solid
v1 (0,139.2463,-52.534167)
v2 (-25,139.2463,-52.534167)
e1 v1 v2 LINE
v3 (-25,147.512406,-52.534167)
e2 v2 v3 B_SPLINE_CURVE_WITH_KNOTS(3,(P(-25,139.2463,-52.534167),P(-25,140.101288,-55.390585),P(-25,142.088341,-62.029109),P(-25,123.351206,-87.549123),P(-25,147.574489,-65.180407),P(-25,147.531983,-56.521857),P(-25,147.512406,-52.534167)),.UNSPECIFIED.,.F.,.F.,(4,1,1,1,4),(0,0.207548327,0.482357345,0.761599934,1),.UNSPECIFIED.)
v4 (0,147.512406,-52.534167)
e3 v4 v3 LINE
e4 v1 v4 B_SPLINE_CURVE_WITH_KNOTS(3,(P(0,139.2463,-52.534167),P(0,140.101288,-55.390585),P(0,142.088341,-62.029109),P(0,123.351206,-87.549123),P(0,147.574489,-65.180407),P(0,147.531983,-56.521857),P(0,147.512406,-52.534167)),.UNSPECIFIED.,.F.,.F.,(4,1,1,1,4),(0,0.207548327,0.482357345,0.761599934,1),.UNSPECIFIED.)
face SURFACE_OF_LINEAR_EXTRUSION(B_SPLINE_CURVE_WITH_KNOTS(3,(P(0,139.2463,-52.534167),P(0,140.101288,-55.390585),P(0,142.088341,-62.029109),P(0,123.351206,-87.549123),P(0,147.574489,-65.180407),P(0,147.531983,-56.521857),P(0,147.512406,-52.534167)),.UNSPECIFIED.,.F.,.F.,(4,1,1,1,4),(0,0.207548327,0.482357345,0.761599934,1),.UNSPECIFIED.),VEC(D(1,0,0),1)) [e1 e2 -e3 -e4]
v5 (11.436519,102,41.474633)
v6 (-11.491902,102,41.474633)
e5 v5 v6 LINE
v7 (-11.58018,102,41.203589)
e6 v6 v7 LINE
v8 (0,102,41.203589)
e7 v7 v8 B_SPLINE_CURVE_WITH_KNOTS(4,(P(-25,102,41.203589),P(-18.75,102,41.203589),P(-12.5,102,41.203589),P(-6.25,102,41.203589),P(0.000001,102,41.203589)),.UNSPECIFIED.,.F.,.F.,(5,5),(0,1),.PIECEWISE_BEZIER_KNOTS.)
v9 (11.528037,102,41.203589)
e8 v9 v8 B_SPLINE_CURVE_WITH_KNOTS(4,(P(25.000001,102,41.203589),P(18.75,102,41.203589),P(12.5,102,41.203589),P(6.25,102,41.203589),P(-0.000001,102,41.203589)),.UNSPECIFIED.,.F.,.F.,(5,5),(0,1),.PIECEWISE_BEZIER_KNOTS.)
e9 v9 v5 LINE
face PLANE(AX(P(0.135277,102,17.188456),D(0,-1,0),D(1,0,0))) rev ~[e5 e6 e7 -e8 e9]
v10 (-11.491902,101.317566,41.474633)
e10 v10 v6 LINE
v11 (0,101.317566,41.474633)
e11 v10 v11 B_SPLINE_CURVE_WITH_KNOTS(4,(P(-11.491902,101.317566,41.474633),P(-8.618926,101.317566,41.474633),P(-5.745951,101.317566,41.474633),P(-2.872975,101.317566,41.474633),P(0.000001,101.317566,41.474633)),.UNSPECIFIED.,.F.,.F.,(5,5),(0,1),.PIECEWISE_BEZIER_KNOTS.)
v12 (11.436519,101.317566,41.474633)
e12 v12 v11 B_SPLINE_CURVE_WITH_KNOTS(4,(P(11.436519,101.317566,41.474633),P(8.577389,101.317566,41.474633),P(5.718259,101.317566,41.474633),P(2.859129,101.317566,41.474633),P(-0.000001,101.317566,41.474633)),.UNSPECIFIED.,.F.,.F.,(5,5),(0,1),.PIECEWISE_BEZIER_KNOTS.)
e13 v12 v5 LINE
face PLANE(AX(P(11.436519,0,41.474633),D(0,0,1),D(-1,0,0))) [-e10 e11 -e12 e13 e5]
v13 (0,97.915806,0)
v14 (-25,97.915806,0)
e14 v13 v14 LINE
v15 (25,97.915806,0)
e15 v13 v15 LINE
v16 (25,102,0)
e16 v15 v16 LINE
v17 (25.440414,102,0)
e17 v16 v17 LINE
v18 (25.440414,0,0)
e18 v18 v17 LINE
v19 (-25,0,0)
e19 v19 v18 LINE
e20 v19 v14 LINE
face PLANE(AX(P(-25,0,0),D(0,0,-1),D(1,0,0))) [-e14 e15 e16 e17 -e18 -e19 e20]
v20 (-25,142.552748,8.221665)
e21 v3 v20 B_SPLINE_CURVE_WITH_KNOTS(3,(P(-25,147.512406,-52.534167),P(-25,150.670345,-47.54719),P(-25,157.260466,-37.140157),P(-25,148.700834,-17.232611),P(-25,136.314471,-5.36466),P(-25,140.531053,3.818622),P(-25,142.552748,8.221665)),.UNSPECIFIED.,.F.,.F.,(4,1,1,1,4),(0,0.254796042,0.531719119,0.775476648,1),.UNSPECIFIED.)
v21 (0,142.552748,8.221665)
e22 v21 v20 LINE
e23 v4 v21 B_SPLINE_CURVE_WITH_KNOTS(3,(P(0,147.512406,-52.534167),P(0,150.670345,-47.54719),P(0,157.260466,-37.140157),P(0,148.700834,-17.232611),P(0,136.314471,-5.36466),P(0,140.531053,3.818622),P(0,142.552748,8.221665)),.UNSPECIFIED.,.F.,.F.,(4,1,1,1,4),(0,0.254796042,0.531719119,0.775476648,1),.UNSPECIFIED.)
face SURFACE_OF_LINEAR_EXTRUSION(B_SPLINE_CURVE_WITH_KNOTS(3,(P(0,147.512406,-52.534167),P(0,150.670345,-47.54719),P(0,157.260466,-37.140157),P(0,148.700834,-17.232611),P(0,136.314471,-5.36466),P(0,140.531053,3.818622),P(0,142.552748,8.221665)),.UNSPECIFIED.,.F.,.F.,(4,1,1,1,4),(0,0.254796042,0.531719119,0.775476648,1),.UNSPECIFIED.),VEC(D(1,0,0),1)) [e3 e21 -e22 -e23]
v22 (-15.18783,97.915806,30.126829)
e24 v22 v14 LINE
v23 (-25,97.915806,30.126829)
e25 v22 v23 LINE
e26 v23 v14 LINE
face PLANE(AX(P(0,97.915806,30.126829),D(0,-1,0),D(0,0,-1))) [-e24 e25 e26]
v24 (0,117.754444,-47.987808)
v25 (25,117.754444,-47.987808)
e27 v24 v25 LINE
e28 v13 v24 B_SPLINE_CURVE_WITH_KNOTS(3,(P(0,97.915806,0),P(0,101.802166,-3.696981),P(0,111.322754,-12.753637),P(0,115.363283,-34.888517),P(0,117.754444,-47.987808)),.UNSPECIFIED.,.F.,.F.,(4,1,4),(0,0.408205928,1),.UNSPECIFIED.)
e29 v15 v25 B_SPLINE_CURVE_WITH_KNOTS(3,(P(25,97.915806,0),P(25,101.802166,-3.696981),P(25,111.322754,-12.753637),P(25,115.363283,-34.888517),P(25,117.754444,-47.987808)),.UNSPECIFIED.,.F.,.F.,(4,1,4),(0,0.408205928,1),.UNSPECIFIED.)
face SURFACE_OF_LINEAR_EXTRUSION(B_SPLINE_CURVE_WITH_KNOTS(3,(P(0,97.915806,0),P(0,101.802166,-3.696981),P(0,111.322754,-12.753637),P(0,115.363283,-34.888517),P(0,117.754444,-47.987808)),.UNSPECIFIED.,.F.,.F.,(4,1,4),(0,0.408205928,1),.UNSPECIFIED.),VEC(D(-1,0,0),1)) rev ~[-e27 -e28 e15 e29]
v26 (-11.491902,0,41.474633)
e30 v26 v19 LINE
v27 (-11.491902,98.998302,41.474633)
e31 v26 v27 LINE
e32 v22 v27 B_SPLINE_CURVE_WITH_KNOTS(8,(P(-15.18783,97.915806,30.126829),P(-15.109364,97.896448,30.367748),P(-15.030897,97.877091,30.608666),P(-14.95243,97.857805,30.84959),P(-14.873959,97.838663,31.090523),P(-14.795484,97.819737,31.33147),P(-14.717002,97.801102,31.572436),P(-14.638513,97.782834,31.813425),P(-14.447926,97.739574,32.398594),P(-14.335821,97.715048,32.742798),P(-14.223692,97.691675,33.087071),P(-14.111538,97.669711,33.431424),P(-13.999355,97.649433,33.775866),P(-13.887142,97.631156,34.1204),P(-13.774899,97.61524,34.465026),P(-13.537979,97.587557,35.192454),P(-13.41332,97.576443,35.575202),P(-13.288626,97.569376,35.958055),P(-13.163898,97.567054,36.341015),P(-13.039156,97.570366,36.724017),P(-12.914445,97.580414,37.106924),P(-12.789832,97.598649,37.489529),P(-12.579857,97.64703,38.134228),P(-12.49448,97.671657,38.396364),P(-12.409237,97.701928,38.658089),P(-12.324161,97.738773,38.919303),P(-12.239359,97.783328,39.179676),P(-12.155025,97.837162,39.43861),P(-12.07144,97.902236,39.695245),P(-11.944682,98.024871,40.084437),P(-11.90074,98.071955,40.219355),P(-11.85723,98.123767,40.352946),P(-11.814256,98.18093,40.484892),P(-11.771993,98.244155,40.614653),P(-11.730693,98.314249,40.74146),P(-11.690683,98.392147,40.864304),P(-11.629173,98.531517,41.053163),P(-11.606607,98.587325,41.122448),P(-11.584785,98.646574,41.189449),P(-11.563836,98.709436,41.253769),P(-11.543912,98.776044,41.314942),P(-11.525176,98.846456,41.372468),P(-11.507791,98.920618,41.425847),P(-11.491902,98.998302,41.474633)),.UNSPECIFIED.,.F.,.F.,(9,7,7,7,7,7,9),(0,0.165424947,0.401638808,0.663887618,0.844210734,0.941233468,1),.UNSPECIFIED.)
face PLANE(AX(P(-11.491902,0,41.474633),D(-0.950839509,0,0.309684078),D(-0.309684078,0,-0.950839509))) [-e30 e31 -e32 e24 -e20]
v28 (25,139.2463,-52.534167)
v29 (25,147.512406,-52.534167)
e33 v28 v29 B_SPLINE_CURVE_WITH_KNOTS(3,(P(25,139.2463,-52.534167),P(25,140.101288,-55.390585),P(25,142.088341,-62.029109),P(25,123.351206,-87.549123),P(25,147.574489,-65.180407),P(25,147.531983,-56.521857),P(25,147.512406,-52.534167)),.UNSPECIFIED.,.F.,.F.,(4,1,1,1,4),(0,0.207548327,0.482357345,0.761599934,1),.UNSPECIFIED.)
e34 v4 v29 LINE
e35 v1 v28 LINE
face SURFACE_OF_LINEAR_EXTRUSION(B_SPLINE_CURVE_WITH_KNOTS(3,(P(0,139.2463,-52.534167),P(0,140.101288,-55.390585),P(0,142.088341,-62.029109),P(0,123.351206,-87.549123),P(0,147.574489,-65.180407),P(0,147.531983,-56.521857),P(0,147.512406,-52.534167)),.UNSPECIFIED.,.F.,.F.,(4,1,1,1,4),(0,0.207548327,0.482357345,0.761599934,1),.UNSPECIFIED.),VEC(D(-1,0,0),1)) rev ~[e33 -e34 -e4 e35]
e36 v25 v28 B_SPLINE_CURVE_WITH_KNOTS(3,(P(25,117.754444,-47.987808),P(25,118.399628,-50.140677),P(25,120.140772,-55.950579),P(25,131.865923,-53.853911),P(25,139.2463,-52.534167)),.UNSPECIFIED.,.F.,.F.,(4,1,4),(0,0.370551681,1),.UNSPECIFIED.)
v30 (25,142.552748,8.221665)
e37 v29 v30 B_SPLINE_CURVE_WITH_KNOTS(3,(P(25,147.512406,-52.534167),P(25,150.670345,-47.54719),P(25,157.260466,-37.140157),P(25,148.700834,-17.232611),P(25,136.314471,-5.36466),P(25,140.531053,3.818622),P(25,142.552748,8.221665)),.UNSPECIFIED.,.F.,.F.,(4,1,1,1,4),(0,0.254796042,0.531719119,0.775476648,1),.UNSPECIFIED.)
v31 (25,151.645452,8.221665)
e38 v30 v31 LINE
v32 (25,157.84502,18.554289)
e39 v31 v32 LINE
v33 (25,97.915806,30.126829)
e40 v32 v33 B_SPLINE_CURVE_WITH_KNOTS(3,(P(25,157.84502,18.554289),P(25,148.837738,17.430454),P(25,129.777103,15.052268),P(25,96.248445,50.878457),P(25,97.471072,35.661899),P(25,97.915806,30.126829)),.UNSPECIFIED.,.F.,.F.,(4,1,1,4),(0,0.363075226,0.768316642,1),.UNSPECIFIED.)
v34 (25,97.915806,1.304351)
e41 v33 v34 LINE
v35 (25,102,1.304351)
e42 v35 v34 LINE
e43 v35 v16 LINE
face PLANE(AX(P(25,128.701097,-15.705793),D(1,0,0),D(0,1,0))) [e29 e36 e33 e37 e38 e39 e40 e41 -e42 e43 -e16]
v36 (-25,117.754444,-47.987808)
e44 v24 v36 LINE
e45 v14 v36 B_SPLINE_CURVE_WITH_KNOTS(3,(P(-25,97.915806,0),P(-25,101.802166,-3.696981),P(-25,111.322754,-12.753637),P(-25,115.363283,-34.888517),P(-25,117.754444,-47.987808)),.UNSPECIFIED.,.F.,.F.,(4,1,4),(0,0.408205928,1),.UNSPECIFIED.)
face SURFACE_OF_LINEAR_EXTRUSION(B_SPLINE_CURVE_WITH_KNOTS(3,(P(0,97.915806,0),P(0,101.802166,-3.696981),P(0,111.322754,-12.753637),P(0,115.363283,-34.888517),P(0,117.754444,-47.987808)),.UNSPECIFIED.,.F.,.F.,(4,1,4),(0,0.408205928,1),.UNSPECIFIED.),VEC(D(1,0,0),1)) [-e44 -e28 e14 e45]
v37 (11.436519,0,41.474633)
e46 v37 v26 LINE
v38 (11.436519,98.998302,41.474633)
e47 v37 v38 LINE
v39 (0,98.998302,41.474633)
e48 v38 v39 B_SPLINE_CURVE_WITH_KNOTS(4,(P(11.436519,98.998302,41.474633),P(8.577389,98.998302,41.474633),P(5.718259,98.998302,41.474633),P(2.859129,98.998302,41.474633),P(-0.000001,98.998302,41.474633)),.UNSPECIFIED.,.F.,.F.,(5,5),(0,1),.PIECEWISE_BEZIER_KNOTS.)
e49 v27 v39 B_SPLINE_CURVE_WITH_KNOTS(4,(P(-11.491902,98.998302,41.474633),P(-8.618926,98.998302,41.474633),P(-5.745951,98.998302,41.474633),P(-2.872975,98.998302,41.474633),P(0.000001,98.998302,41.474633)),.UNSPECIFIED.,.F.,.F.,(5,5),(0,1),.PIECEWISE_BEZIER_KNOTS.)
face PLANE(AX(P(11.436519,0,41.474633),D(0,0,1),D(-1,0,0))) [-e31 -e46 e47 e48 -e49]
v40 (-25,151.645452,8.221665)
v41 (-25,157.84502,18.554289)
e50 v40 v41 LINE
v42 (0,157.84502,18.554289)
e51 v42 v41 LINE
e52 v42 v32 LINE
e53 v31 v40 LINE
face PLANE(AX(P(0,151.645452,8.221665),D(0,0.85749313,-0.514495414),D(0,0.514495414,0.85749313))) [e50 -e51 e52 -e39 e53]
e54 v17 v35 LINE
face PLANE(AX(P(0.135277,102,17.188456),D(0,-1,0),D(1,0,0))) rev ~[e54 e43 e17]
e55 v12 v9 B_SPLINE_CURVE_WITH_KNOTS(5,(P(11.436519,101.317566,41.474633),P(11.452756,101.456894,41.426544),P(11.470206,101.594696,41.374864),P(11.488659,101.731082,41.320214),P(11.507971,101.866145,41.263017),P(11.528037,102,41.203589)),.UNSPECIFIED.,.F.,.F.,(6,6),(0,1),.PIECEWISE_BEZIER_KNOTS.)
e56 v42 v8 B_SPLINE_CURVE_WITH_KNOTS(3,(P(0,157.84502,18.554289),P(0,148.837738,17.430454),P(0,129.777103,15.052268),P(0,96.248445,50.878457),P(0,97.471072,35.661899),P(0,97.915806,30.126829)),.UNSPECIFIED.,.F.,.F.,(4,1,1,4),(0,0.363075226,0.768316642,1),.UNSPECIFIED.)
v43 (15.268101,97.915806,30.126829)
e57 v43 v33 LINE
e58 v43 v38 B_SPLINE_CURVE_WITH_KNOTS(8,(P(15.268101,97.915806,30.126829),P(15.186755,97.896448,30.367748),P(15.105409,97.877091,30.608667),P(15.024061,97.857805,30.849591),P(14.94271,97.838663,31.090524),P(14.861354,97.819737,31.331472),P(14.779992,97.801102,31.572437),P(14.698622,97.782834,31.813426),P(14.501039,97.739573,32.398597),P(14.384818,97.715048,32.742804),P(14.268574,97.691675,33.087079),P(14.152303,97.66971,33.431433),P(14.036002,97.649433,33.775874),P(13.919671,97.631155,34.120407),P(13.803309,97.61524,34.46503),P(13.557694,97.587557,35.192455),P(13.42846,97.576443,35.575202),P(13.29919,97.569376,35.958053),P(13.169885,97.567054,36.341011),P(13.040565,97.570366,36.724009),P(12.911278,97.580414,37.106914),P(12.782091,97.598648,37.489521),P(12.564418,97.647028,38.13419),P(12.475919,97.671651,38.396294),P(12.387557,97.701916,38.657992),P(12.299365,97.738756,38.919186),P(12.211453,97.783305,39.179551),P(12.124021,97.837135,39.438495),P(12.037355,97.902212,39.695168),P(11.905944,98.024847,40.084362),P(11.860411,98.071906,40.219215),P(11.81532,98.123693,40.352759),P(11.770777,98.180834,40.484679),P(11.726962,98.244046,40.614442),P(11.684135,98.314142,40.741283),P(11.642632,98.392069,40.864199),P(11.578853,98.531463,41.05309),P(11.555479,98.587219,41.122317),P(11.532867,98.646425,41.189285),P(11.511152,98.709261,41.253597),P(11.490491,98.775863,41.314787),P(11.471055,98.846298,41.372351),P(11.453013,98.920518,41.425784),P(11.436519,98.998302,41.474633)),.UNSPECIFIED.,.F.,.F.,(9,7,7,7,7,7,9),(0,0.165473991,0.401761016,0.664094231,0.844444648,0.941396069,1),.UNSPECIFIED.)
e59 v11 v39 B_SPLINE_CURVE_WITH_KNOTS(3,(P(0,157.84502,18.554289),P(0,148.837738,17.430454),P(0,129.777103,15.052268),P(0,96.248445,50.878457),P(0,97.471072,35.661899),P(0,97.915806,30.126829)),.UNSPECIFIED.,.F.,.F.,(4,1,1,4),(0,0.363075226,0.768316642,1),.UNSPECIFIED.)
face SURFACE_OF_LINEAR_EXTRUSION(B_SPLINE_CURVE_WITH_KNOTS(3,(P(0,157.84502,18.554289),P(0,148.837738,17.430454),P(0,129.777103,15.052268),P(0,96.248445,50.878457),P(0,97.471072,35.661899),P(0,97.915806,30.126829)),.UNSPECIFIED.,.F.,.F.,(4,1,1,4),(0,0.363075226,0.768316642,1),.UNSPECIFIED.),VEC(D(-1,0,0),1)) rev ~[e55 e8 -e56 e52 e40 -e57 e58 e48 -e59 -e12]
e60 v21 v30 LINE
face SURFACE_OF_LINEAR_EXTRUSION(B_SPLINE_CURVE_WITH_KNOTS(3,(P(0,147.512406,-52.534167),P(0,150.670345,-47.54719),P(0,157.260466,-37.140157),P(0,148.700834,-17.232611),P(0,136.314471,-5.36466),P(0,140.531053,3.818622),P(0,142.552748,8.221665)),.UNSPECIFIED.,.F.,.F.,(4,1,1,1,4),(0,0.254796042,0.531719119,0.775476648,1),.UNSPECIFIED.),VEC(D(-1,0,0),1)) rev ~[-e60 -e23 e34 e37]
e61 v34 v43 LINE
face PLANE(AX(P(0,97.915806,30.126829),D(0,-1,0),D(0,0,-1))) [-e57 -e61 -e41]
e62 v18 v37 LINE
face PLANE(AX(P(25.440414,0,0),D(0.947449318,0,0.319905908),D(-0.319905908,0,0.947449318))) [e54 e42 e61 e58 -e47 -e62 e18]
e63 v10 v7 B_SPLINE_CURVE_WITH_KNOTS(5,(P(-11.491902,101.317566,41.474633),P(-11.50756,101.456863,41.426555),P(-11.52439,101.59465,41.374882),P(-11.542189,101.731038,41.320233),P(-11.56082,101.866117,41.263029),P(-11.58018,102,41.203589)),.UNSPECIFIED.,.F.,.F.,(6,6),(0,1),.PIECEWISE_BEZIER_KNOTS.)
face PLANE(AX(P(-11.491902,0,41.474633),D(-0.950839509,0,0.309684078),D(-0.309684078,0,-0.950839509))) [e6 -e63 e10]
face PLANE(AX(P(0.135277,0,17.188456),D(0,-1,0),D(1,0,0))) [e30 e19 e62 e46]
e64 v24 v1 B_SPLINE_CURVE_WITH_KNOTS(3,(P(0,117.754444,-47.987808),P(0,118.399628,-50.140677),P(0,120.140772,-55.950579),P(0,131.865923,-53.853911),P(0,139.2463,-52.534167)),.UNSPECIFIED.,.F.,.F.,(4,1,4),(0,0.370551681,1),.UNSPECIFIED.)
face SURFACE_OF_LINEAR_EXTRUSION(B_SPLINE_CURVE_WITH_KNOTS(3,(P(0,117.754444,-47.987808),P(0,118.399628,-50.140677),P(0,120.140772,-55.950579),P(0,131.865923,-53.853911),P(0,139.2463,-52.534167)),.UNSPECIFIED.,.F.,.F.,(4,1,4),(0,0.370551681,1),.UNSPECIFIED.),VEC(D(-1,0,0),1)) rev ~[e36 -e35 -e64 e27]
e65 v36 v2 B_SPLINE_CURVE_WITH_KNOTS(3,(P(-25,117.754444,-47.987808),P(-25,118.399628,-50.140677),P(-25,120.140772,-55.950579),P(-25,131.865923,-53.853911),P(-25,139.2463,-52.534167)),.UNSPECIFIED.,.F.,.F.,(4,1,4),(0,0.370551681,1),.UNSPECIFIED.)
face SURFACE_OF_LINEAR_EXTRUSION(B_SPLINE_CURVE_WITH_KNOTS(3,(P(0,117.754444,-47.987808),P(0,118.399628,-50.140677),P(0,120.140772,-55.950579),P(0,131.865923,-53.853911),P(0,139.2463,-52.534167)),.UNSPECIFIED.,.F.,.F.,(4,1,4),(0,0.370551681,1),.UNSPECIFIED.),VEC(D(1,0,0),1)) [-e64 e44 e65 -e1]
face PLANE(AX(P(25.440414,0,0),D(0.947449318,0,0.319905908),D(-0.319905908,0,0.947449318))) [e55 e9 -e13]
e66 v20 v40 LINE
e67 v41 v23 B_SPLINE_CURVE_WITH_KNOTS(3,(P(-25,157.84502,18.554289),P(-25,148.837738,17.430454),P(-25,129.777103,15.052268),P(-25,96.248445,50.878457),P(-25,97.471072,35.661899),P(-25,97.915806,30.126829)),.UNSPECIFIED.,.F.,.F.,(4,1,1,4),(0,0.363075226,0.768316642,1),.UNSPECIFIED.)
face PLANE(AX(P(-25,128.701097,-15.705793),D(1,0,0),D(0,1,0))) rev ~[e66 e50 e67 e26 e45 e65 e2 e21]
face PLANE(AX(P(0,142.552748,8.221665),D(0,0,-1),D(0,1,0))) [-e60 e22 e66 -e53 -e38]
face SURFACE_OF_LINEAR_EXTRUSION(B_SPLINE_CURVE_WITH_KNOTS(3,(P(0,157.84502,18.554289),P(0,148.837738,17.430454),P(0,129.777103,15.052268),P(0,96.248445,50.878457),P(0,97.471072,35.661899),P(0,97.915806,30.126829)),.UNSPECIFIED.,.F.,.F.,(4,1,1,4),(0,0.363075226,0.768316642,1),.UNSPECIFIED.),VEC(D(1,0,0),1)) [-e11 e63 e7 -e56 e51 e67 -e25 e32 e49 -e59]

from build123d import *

# Parameters (mm, degrees)
F1_DEPTH      = 25
F1_DEPTH_BACK = 25
F3_DEPTH      = 102


with BuildPart() as f1:
    # F0 (on Right) → F1 (new body, two sides)
    with BuildSketch(Plane.YZ) as f1_sk:
        with BuildLine():
            Line((97.9158058763, 30.1268287003), (97.9158058763, 0))
            add(Edge.make_bspline(
                [(97.9158058763, 0), (101.8021663079, -3.696980686), (111.322754248, -12.7536367407), (115.3632833237, -34.8885167563), (117.7544444799, -47.9878075421)],
                knots=[0, 0, 0, 0, 0.4082059276, 1, 1, 1, 1], degree=3))
            add(Edge.make_bspline(
                [(117.7544444799, -47.9878075421), (118.3996283157, -50.1406766369), (120.140772316, -55.9505790246), (131.8659232896, -53.853910931), (139.2462998629, -52.5341667235)],
                knots=[0, 0, 0, 0, 0.3705516808, 1, 1, 1, 1], degree=3))
            add(Edge.make_bspline(
                [(139.2462998629, -52.5341667235), (140.1012876765, -55.3905852567), (142.0883412882, -62.0291088385), (123.351206173, -87.5491233148), (147.5744893106, -65.1804071235), (147.5319825692, -56.5218574441), (147.5124061108, -52.5341667235)],
                knots=[0, 0, 0, 0, 0.2075483266, 0.4823573452, 0.7615999345, 1, 1, 1, 1], degree=3))
            add(Edge.make_bspline(
                [(147.5124061108, -52.5341667235), (150.6703452653, -47.5471900273), (157.2604657803, -37.1401568881), (148.7008340103, -17.2326111997), (136.3144713941, -5.3646602758), (140.5310533356, 3.8186216049), (142.5527483225, 8.2216653973)],
                knots=[0, 0, 0, 0, 0.2547960421, 0.5317191187, 0.7754766483, 1, 1, 1, 1], degree=3))
            Line((142.5527483225, 8.2216653973), (151.6454517841, 8.2216653973))
            Line((151.6454517841, 8.2216653973), (157.8450202942, 18.5542888939))
            add(Edge.make_bspline(
                [(157.8450202942, 18.5542888939), (148.8377384911, 17.4304544494), (129.7771030879, 15.0522676591), (96.2484454593, 50.8784565164), (97.4710717705, 35.6618987099), (97.9158058763, 30.1268287003)],
                knots=[0, 0, 0, 0, 0.3630752259, 0.7683166416, 1, 1, 1, 1], degree=3))
        make_face()
    extrude(amount=F1_DEPTH)
    extrude(f1_sk.sketch, amount=-F1_DEPTH_BACK)

    # F2 (on Front) → F3 (join)
    with BuildSketch(Plane.XZ):
        Polygon((-11.4919018, 41.4746329188), (-25, 0), (0, 0), (25.4404135048, 0), (11.436519213, 41.4746329188), (0, 41.4746329188), align=None)
    extrude(amount=-F3_DEPTH)


solid = f1.part
